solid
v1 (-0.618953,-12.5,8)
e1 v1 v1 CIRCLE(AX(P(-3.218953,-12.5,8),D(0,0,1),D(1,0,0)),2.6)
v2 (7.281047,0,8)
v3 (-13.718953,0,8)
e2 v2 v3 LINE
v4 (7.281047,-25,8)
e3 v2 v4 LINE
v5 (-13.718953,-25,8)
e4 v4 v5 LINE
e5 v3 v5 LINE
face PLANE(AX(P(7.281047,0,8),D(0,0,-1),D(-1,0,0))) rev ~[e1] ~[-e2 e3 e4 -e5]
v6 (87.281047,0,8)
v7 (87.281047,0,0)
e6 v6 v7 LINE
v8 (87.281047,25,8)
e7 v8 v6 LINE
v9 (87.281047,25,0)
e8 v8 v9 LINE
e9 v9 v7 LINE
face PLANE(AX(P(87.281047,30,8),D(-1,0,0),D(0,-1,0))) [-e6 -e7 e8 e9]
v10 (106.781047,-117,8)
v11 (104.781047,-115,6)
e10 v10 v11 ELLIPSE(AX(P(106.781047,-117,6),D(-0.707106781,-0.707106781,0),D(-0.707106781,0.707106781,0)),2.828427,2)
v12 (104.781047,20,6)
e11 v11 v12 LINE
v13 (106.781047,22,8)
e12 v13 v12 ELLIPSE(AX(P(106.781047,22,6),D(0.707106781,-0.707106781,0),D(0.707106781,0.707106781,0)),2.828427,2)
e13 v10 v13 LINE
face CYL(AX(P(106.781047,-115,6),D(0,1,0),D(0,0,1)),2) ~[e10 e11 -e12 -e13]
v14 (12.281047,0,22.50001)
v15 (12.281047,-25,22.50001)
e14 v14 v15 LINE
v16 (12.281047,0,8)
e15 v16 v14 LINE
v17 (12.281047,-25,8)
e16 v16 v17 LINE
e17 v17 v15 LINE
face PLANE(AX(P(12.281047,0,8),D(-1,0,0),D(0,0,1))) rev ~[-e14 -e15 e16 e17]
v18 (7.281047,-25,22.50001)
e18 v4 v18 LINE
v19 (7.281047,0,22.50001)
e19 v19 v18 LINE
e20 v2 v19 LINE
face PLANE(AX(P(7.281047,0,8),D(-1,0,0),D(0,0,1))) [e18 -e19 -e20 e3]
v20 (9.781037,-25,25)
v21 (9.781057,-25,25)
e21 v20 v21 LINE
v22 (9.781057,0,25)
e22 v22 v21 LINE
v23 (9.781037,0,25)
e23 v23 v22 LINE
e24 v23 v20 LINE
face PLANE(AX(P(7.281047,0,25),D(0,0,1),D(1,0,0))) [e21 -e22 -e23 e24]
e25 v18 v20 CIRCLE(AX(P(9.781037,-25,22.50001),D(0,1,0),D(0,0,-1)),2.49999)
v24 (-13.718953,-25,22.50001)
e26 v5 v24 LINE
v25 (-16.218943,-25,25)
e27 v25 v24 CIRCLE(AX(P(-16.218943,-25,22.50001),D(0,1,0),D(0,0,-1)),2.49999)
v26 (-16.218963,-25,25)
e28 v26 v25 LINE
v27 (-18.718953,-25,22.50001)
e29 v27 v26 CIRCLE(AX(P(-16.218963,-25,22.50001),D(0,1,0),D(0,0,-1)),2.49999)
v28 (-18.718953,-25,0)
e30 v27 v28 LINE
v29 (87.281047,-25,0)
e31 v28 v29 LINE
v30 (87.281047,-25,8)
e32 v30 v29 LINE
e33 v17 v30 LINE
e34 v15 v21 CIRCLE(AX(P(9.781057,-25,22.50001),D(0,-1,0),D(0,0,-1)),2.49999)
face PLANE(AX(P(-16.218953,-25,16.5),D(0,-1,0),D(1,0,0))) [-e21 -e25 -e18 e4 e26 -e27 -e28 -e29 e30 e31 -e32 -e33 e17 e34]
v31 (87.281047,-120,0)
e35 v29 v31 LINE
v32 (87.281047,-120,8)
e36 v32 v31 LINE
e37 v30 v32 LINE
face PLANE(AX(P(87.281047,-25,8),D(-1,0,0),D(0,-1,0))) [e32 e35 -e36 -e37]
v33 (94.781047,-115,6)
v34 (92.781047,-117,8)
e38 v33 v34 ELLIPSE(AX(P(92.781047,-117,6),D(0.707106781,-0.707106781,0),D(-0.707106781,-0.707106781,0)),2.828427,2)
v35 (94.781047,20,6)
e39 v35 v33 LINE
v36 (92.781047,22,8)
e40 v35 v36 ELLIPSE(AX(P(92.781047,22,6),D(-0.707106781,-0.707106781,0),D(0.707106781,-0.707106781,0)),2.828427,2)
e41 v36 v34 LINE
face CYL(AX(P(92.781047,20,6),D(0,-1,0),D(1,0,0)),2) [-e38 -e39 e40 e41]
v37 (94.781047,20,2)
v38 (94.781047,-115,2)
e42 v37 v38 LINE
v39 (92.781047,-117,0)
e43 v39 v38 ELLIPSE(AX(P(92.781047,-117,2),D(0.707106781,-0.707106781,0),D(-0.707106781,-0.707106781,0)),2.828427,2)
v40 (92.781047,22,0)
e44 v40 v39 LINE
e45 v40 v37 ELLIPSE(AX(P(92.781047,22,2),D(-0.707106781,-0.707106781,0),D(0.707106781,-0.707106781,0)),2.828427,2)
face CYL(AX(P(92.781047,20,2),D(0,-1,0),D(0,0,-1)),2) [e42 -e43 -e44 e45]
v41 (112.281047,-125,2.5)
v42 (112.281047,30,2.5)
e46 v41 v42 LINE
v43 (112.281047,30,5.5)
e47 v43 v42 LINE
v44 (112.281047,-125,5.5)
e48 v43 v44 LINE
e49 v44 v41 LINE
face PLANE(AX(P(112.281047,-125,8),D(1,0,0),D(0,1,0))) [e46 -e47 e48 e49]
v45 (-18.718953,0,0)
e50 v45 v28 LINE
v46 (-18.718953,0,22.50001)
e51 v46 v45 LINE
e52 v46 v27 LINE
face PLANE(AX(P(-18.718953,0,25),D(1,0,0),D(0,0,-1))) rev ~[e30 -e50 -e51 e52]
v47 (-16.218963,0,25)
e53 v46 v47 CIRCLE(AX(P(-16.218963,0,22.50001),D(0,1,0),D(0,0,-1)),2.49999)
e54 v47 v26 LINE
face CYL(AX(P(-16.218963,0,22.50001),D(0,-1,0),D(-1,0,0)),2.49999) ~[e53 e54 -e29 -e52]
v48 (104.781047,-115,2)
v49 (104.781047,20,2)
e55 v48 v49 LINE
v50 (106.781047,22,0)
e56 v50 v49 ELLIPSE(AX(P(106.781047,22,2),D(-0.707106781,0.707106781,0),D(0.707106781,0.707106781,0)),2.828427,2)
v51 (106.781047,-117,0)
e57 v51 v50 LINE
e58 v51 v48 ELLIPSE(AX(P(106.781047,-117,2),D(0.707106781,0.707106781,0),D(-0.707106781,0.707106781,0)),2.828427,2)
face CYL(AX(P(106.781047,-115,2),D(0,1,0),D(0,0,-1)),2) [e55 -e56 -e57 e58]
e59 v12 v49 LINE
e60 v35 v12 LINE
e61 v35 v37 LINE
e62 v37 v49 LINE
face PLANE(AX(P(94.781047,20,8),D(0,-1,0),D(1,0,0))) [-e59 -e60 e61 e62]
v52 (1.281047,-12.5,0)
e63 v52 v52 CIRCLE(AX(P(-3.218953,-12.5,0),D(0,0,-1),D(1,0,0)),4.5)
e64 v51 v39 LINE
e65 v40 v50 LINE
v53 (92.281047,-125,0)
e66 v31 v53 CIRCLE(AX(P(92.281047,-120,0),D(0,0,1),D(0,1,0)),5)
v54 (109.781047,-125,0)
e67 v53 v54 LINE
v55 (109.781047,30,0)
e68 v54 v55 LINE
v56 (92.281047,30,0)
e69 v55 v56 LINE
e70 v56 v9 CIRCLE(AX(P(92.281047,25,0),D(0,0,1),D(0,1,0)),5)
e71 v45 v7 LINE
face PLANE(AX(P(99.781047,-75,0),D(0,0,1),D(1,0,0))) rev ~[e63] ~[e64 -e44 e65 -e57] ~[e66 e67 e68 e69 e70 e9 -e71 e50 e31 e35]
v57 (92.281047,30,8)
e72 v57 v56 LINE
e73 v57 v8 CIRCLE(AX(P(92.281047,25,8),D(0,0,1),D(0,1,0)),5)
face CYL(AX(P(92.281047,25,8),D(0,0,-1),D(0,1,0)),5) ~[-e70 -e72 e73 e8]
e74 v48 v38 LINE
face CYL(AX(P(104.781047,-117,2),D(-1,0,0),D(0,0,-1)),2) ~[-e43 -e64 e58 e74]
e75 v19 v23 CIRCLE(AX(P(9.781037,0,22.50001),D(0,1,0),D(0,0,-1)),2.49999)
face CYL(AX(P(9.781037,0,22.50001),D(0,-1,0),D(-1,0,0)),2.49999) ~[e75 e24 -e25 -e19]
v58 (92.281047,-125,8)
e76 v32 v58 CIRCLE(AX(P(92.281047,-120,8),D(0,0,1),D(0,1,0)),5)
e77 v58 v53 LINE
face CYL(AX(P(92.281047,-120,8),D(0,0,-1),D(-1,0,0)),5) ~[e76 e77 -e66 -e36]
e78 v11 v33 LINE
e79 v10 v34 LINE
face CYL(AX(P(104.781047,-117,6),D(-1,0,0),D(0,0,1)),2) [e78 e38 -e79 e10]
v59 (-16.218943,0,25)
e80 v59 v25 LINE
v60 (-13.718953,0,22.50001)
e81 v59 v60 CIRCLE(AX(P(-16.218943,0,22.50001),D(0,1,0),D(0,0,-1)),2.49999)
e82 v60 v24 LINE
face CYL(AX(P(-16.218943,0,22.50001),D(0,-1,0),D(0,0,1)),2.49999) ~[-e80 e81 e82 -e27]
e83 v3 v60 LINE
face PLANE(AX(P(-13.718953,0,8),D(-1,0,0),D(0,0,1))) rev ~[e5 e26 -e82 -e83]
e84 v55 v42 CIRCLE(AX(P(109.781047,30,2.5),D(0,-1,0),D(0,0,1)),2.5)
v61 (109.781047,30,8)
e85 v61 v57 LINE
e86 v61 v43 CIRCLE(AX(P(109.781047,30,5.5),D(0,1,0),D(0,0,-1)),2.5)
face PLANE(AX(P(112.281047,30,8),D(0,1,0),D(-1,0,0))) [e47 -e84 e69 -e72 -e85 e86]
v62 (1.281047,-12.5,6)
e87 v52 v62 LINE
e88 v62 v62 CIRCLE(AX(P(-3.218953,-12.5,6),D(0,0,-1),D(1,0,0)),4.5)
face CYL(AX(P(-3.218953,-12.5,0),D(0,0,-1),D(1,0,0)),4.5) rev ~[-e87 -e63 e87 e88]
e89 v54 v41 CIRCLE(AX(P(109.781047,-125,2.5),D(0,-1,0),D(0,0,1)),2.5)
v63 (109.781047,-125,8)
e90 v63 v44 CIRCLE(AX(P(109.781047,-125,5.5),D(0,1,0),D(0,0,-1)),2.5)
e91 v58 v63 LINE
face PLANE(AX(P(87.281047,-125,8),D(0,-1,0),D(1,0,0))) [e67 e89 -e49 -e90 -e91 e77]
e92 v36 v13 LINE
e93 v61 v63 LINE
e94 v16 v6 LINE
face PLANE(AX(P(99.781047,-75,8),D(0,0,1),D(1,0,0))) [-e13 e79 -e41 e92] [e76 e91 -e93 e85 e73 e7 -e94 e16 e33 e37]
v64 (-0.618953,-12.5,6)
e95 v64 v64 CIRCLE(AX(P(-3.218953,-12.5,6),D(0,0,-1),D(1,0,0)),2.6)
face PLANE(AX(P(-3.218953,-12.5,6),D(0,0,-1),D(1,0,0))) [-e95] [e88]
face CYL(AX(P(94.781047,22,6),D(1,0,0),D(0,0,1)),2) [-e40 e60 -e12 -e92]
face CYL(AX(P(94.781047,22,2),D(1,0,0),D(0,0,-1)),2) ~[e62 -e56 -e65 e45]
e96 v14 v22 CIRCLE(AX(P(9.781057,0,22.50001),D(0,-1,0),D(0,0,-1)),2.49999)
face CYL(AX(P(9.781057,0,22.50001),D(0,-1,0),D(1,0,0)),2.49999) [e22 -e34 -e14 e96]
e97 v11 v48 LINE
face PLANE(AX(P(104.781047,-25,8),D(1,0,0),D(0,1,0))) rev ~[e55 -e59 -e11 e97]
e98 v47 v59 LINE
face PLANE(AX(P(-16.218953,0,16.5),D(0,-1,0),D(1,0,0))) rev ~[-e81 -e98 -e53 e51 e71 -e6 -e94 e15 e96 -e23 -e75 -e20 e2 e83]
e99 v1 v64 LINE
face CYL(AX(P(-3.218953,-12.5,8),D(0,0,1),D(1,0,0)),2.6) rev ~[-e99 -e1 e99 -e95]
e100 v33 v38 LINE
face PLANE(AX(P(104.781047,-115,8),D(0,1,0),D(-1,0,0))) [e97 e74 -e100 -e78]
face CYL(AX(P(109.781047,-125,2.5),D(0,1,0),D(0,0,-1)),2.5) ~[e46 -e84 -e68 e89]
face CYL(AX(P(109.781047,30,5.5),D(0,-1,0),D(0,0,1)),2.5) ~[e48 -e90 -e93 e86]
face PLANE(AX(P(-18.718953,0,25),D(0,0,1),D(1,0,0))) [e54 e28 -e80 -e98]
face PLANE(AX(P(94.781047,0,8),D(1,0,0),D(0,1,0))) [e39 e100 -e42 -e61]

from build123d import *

# Parameters (mm, degrees)
F0_W      = 5
F0_H      = 17
F0_H_2    = 8
F0_W_2    = 21
F0_W_3    = 100
F1_DEPTH  = 25
F3_DEPTH  = 8
F4_R      = 2.5
F5_R      = 2.49999
F6_R      = 2.6
F7_DEPTH  = 25
F8_R      = 5
F9_R      = 4.5
F9_R_2    = 2.6
F10_DEPTH = 6
F2_W      = 10
F2_H      = 25
F11_DEPTH = 25
F12_R     = 2


# Not quite as in the source:
# - a fillet or chamfer is up to 0.001 mm smaller than in the source, because OpenCascade refuses the exact size


with BuildPart() as f1:
    # F0 (on Front) → F1 (new body)
    with BuildSketch(Plane.XZ):
        with Locations((-16.2189533483, 16.5)):
            Rectangle(F0_W, F0_H)
        with Locations((-16.2189533483, 4)):
            Rectangle(F0_W, F0_H_2)
        with Locations((-3.2189533483, 4)):
            Rectangle(F0_W_2, F0_H_2)
        with Locations((9.7810466517, 4)):
            Rectangle(F0_W, F0_H_2)
        with Locations((9.7810466517, 16.5)):
            Rectangle(F0_W, F0_H)
        with Locations((62.2810466517, 4)):
            Rectangle(F0_W_3, F0_H_2)
    extrude(amount=F1_DEPTH)

    # F2 (on face) → F3 (join)
    with BuildSketch(Plane.XY.offset(8)):
        Polygon((87.2810466517, -125), (112.2810466517, -125), (112.2810466517, -25), (104.7810466517, -25), (104.7810466517, -115), (94.7810466517, -115), (94.7810466517, -25), (87.2810466517, -25), align=None)
        Polygon((104.7810466517, 0), (112.2810466517, 0), (112.2810466517, 30), (87.2810466517, 30), (87.2810466517, 0), (94.7810466517, 0), (94.7810466517, 20), (104.7810466517, 20), align=None)
    extrude(amount=-F3_DEPTH)

    # F4
    f4_edges = [f1.edges().sort_by_distance(p)[0] for p in [
        (112.281047, -47.5, 0),
        (112.281047, -47.5, 8),
    ]]
    fillet(f4_edges, radius=F4_R)

    # F5 (radius 2.5 in the source; OpenCascade refuses exactly that, so slightly less here)
    f5_edges = [f1.edges().sort_by_distance(p)[0] for p in [
        (12.281047, -12.5, 25),
        (7.281047, -12.5, 25),
        (-18.718953, -12.5, 25),
        (-13.718953, -12.5, 25),
    ]]
    fillet(f5_edges, radius=F5_R)

    # F6 (on face) → F7 (cut)
    with BuildSketch(Plane.XY.offset(8)):
        with Locations((-3.2189533483, -12.5)):
            Circle(F6_R)
    extrude(amount=-F7_DEPTH, mode=Mode.SUBTRACT)

    # F8
    f8_edges = [f1.edges().sort_by_distance(p)[0] for p in [
        (87.281047, 30, 4),
        (87.281047, -125, 4),
    ]]
    fillet(f8_edges, radius=F8_R)

    # F9 (on face) → F10 (cut)
    with BuildSketch(Plane(origin=(0, 0, 0), x_dir=(1, 0, 0), z_dir=(0, 0, -1))):
        with Locations((-3.2189533483, 12.5)):
            Circle(F9_R)
        with Locations((-3.2189533483, 12.5)):
            Circle(F9_R_2, mode=Mode.SUBTRACT)
    extrude(amount=-F10_DEPTH, mode=Mode.SUBTRACT)

    # F2 (on face) → F11 (cut)
    with BuildSketch(Plane.XY.offset(8)):
        with Locations((99.7810466517, -12.5)):
            Rectangle(F2_W, F2_H)
    extrude(amount=-F11_DEPTH, mode=Mode.SUBTRACT)

    # F12
    f12_edges = [f1.edges().sort_by_distance(p)[0] for p in [
        (94.781047, -47.5, 8),
        (99.781047, 20, 8),
        (104.781047, -47.5, 8),
        (99.781047, -115, 8),
        (99.781047, 20, 0),
        (94.781047, -47.5, 0),
        (104.781047, -47.5, 0),
        (99.781047, -115, 0),
    ]]
    fillet(f12_edges, radius=F12_R)


solid = f1.part
